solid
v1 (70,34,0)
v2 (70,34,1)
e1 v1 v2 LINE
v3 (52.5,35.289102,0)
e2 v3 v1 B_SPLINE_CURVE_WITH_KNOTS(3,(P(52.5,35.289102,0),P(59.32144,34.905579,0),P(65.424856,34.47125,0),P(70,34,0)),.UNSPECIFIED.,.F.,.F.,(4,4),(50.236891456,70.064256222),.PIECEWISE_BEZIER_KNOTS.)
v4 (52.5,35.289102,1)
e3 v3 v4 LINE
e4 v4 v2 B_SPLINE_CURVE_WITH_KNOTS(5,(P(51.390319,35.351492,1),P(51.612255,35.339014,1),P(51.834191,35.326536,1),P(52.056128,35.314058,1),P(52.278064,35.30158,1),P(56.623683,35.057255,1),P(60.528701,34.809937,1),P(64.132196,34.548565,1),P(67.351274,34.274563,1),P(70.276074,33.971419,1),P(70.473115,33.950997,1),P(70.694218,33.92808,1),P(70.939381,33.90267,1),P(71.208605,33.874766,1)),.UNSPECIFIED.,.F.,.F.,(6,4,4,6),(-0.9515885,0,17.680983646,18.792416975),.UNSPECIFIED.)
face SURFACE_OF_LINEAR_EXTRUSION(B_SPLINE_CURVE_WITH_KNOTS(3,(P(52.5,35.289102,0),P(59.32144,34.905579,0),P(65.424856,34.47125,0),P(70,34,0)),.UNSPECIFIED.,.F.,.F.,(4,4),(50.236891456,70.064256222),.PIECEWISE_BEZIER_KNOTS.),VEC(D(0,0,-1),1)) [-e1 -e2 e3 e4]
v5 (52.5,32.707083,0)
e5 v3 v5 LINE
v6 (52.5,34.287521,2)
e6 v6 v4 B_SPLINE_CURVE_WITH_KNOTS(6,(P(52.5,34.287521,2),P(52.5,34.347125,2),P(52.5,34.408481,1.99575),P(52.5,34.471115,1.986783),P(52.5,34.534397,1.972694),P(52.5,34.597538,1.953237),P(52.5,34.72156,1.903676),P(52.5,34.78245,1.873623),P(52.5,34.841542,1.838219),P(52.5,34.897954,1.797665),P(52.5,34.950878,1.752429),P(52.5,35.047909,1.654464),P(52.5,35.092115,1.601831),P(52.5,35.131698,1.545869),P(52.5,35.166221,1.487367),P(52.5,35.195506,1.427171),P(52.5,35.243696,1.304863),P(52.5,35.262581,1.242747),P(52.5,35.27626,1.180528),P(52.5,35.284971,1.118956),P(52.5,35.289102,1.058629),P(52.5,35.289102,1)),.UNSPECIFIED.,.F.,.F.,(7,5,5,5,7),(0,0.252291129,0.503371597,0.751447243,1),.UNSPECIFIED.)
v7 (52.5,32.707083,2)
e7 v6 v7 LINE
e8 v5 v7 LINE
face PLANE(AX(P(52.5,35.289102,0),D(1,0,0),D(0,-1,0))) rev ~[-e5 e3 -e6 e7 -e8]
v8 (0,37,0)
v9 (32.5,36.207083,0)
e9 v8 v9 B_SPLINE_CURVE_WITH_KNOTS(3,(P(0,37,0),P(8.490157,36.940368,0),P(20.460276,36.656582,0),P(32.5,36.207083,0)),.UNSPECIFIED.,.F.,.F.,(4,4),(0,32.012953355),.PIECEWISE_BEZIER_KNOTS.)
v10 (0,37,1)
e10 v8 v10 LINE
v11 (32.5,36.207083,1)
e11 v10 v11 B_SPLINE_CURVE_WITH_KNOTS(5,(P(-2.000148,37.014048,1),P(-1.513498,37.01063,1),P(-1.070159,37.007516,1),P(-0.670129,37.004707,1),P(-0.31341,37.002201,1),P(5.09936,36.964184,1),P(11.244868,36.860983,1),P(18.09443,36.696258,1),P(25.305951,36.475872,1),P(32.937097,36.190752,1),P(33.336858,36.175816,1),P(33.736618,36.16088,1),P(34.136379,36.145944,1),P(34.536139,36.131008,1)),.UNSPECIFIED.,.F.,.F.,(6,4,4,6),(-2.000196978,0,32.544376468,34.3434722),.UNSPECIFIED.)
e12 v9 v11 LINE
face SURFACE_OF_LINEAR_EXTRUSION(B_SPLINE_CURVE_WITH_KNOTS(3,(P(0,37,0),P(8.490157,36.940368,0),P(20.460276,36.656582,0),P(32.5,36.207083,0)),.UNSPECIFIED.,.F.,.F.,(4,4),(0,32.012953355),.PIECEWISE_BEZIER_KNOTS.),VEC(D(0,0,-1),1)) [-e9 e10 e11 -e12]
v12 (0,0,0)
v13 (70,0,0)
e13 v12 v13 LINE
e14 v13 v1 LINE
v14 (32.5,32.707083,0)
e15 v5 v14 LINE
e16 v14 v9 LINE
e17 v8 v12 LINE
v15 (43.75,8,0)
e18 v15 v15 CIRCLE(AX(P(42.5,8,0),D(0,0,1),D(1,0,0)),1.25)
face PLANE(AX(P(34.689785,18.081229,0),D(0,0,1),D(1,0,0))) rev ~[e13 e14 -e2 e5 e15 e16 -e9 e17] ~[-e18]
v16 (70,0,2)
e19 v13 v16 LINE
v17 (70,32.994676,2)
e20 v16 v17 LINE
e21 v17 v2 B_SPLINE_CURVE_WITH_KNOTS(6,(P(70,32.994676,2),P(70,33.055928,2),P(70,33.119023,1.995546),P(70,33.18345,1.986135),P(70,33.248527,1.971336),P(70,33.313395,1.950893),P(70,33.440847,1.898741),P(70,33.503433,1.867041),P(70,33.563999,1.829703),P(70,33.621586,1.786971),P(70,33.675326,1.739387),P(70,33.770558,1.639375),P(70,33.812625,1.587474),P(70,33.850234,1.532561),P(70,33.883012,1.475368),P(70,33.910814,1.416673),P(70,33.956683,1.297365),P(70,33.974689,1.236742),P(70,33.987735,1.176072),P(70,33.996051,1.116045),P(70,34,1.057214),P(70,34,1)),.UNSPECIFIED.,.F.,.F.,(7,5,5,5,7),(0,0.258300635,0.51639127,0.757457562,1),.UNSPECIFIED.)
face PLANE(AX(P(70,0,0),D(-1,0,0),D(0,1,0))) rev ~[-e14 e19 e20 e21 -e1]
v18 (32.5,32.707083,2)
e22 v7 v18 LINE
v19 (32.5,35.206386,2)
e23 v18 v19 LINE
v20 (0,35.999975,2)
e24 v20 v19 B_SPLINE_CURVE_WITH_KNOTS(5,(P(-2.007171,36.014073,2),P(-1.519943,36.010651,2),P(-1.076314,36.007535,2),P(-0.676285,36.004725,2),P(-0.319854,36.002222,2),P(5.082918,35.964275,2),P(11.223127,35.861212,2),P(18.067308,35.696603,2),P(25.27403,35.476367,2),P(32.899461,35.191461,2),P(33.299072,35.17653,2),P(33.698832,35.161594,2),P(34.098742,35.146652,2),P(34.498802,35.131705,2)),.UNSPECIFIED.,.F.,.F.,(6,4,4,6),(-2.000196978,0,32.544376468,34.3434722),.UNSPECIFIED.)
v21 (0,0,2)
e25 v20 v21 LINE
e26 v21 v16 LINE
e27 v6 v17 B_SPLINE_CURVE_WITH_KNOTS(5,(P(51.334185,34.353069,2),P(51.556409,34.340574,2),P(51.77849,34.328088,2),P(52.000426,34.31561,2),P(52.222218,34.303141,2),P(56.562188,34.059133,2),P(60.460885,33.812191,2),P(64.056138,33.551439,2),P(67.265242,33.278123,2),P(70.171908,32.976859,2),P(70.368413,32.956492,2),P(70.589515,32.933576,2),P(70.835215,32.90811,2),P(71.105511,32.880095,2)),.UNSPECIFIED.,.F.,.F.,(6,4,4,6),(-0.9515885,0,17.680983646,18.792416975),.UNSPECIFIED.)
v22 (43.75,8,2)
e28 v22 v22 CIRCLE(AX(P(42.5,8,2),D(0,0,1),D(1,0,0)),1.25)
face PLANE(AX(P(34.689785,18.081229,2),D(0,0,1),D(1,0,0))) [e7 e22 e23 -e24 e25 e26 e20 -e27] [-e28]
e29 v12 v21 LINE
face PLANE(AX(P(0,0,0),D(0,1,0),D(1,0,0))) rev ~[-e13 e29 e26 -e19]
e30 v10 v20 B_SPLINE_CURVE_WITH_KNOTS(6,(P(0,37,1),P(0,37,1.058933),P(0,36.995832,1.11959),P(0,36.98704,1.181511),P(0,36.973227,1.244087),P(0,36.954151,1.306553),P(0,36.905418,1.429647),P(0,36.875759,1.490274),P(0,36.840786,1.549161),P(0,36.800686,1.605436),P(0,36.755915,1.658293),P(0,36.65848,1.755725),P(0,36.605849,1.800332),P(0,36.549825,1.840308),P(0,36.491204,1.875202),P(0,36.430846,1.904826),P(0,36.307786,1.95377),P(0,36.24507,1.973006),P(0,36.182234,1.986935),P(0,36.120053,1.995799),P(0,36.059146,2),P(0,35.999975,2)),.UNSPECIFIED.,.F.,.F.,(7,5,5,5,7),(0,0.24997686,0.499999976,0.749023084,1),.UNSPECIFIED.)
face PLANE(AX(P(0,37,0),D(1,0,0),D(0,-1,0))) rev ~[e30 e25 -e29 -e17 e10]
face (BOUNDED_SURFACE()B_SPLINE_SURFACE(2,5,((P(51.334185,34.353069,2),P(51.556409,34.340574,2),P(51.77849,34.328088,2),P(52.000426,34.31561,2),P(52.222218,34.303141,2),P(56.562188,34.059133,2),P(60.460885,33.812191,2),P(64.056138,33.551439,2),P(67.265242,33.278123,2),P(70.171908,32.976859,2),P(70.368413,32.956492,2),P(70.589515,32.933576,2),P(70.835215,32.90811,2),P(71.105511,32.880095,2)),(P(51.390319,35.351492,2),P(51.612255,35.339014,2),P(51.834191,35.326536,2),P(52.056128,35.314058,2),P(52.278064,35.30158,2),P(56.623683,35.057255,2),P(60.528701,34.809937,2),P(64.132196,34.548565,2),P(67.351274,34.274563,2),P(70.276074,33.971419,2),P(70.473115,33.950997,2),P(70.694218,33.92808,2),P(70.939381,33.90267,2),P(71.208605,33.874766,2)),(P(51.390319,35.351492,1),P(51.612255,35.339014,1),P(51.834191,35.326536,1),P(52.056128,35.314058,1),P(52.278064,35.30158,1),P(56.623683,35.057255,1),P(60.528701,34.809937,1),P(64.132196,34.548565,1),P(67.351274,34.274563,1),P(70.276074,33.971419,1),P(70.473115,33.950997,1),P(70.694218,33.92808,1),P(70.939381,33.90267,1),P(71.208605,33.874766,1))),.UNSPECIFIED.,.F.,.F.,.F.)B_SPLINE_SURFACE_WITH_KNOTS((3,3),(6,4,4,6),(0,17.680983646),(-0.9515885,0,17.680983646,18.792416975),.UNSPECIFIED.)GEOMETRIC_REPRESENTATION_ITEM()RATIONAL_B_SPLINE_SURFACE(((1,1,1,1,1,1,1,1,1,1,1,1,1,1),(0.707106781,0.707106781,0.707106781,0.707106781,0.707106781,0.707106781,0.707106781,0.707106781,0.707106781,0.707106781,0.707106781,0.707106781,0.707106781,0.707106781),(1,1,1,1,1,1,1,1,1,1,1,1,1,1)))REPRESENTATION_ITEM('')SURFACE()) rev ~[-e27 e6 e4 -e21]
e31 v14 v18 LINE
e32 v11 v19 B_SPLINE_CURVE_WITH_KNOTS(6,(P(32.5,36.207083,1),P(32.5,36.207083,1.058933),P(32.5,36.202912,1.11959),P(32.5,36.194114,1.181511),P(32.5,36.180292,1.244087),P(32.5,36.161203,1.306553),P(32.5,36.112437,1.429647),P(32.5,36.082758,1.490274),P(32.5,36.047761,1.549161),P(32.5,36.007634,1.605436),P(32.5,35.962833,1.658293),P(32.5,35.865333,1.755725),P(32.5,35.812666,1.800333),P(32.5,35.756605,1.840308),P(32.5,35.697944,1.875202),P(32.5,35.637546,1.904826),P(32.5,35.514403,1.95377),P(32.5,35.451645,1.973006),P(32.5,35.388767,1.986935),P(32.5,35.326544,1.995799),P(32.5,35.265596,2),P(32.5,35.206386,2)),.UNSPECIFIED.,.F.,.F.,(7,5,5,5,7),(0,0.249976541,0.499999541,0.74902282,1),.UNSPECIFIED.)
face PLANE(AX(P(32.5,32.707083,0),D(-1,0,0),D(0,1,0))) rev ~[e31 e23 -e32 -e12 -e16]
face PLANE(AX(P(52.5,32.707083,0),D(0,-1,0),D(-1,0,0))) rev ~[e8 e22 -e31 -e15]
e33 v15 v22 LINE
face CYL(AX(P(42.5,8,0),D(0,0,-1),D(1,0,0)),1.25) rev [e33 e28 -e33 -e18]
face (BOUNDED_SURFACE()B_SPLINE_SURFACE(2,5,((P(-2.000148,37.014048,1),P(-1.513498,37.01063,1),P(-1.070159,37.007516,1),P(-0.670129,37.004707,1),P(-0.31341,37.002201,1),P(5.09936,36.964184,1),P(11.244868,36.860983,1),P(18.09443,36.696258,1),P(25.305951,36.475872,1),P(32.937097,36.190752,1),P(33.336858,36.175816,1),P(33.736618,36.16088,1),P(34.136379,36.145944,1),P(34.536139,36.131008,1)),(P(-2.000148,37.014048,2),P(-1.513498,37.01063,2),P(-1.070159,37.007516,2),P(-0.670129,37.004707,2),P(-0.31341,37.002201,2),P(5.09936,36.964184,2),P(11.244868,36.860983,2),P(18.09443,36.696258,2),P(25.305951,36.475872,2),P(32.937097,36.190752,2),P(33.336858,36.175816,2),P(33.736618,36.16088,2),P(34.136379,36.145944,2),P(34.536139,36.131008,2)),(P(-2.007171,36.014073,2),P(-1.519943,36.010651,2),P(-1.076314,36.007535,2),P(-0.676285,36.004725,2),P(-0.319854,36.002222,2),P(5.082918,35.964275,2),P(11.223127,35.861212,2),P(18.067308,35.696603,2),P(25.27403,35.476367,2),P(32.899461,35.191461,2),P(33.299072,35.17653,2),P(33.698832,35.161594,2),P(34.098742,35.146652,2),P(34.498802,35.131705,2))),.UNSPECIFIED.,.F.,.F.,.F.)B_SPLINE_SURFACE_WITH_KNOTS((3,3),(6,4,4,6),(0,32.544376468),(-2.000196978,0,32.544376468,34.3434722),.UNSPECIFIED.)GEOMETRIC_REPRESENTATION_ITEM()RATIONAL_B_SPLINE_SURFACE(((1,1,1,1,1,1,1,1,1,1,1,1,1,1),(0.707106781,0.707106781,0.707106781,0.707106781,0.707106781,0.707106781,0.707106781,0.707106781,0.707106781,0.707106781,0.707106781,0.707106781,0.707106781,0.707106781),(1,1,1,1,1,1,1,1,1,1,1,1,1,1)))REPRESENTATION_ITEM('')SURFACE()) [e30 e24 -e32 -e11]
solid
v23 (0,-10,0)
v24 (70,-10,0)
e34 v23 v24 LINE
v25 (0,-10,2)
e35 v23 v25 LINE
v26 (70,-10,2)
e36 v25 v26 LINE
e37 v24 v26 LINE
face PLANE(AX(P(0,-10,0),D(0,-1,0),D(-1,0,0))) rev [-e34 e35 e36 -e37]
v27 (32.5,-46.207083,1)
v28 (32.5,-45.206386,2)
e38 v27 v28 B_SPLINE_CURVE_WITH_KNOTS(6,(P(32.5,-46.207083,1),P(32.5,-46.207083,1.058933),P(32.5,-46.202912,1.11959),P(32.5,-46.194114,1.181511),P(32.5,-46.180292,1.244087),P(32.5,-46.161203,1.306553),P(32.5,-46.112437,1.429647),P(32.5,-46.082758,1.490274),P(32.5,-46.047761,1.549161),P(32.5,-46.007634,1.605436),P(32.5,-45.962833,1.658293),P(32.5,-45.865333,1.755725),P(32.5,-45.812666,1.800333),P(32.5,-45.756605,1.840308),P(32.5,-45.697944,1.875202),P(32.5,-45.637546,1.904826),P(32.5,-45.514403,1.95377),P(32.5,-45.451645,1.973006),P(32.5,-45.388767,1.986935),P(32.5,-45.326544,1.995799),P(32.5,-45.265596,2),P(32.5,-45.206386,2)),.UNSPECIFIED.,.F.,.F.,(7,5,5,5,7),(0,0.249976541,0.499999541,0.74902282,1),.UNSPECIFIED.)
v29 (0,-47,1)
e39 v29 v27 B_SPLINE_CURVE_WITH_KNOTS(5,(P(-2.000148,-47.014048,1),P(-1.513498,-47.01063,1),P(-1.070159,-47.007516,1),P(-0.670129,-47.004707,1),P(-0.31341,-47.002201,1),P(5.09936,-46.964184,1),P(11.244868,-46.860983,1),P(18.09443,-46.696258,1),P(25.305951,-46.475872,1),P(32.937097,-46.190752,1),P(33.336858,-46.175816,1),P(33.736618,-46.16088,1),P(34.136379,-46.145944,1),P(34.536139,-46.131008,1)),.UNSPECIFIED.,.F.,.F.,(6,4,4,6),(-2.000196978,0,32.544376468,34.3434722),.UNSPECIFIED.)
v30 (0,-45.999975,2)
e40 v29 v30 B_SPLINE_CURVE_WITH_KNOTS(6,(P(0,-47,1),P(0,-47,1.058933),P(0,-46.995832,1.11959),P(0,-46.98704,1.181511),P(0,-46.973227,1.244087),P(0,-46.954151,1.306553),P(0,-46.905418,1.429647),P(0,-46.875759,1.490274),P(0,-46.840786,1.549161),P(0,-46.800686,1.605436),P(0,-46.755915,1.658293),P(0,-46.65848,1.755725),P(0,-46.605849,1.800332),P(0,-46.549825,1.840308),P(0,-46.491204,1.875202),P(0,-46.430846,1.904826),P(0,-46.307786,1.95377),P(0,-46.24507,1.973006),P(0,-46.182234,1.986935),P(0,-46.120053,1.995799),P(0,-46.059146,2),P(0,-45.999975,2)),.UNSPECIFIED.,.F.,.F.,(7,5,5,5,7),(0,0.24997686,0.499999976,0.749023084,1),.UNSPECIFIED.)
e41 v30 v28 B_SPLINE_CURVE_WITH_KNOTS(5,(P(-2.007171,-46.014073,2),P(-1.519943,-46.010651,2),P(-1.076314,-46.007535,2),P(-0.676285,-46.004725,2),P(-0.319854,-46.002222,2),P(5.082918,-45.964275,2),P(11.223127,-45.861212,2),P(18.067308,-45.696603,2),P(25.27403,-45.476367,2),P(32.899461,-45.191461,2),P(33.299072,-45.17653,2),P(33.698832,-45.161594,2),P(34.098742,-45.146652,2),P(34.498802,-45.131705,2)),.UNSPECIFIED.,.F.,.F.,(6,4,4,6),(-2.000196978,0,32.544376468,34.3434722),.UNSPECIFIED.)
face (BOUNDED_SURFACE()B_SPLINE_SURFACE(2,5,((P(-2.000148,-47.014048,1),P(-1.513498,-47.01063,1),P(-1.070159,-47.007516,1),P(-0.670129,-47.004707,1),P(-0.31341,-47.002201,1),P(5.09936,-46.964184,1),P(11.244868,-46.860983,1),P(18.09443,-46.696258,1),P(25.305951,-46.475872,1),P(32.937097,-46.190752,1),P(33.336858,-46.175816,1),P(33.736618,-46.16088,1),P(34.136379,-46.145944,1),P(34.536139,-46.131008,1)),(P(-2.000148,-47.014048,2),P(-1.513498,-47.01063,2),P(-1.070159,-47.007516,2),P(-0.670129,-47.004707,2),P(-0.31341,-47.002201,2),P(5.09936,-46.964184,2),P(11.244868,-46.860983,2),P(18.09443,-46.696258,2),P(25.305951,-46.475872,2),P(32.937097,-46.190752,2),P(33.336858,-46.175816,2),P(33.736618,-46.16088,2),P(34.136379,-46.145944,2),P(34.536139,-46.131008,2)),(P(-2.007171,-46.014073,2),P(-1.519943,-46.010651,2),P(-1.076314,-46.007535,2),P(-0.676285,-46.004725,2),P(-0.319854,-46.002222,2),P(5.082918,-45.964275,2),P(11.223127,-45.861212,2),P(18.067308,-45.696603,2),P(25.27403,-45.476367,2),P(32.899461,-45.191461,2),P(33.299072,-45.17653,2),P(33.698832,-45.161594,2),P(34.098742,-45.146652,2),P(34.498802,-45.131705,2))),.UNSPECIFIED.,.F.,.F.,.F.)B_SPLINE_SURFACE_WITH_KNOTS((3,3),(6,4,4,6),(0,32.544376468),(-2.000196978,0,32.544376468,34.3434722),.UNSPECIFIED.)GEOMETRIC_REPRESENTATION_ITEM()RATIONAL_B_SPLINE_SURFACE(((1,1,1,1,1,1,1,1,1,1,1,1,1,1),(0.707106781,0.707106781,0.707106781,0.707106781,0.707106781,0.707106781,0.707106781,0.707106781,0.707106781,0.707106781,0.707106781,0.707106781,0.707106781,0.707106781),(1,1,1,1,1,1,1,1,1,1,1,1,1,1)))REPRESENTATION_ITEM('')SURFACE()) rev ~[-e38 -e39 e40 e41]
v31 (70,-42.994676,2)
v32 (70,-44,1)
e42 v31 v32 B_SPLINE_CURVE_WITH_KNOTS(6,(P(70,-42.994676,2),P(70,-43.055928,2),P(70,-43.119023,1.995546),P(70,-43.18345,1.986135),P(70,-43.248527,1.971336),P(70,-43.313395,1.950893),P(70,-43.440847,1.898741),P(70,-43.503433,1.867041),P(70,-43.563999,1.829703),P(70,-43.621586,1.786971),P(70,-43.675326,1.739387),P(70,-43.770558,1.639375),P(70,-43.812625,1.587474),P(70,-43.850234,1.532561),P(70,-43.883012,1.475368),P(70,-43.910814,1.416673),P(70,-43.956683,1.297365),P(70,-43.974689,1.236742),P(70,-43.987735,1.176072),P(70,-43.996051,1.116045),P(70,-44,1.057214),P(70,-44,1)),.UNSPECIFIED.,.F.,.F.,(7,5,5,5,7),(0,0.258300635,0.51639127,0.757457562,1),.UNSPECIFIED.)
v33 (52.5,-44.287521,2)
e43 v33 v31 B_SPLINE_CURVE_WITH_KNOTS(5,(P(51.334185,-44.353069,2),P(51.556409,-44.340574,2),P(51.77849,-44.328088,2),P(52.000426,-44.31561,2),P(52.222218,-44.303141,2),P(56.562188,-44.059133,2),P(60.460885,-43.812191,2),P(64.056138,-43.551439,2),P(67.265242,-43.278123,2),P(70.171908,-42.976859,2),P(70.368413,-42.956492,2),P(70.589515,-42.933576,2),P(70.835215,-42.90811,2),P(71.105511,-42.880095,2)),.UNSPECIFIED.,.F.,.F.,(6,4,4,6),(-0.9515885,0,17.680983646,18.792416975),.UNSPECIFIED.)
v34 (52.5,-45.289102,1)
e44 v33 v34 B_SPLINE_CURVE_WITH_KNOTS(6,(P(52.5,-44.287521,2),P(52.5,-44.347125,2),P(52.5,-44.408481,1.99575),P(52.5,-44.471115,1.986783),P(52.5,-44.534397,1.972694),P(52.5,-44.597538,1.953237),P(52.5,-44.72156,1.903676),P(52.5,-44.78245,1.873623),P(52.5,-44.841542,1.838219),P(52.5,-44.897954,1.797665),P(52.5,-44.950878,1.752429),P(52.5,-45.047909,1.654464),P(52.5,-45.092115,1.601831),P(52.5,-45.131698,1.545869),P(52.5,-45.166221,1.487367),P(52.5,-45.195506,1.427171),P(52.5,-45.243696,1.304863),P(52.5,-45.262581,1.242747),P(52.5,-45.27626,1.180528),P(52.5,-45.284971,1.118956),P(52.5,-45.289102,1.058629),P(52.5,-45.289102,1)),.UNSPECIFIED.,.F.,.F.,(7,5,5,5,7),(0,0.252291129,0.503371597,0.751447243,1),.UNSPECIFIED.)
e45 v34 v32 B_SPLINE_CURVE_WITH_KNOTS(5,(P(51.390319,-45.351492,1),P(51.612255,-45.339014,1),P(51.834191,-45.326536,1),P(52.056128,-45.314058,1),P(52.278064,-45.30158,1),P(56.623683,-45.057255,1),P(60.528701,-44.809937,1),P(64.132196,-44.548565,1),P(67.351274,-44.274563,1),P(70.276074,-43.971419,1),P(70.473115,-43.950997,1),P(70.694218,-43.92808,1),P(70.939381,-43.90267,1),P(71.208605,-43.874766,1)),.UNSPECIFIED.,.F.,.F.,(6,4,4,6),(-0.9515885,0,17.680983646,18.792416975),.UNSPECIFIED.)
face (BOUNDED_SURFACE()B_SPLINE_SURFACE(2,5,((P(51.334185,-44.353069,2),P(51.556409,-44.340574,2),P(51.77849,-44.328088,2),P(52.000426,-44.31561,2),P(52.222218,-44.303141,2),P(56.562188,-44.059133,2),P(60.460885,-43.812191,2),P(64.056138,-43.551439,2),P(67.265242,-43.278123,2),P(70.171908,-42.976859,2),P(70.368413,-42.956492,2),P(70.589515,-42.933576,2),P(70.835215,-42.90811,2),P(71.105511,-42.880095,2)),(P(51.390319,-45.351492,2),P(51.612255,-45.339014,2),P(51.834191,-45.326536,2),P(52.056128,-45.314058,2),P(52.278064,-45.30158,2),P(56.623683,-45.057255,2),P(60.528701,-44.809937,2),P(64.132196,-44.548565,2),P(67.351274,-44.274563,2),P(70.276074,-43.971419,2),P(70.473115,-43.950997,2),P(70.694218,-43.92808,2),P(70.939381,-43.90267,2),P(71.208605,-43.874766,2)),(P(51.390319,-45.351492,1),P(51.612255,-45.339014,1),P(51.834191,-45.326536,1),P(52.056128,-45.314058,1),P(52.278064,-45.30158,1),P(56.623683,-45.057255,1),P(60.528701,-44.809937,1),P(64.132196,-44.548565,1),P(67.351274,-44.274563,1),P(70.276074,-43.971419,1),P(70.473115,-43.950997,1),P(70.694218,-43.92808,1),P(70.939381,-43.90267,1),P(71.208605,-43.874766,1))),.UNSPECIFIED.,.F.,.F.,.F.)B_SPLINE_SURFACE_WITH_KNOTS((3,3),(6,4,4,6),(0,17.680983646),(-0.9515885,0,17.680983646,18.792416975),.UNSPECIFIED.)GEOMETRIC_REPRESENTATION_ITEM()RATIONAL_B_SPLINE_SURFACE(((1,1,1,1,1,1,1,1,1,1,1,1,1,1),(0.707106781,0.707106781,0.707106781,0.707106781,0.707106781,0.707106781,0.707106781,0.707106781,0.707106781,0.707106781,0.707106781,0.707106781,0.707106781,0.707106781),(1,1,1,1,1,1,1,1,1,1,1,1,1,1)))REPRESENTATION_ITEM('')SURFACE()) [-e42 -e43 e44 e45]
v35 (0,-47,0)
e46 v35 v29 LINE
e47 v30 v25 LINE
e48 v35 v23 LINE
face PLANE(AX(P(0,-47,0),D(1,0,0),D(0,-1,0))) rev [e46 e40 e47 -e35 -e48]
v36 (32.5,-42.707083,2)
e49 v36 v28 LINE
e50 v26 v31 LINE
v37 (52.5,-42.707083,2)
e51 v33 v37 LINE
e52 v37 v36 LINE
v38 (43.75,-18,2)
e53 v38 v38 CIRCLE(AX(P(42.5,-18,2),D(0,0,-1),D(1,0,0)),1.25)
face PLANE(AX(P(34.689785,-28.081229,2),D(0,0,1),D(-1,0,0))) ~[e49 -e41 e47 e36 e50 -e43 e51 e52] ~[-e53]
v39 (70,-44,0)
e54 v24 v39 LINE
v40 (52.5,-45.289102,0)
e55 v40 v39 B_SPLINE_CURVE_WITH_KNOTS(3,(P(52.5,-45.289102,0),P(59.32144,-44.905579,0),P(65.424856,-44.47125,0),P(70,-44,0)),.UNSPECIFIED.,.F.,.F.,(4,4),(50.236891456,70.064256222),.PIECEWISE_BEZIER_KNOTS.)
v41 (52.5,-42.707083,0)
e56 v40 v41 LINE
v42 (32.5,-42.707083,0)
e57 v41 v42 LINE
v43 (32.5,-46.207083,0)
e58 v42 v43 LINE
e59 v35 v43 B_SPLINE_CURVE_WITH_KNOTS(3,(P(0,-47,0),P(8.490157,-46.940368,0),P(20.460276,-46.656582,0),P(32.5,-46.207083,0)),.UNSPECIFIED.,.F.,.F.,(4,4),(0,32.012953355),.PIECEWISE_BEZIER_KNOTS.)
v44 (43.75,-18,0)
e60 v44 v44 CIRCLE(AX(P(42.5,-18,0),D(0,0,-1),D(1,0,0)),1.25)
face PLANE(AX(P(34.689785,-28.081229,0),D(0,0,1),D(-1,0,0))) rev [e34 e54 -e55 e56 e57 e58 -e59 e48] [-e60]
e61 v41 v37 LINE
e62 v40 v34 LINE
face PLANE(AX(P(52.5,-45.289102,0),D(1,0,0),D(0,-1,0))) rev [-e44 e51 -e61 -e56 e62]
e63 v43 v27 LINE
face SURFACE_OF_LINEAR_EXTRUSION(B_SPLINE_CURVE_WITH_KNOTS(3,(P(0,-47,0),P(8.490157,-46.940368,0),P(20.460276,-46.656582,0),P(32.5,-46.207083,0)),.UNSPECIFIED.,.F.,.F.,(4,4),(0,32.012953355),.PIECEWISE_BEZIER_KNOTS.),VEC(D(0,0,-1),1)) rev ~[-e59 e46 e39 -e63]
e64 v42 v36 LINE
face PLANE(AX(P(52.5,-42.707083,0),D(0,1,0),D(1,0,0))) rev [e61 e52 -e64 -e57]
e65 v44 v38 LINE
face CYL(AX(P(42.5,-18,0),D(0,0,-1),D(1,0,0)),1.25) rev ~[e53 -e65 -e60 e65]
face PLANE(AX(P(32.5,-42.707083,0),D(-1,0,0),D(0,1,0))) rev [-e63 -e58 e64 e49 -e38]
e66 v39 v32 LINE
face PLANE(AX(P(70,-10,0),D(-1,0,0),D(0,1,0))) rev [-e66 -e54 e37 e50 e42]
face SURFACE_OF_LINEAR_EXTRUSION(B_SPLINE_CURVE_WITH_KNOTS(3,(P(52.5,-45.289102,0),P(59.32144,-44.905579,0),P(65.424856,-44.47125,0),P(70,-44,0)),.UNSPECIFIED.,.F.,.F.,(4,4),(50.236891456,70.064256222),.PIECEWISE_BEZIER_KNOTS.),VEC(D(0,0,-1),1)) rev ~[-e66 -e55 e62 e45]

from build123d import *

# Parameters (mm, degrees)
F0_R     = 1.25
F1_DEPTH = 2
F2_DEPTH = 2
F3_R     = 1


# Not quite as in the source:
# - a feature names something its author has since deleted; it is built from what else it names


with BuildPart() as f1:
    # F0 (on Top) → F1 (new body)
    with BuildSketch(Plane.XY):
        with BuildLine():
            Line((0, 37), (0, 0))
            Line((0, 0), (70, 0))
            Line((70, 0), (70, 34))
            add(Edge.make_bspline(
                [(52.5, 35.2891019981), (59.3214395591, 34.9055787176), (65.4248555138, 34.4712498014), (70, 34)],
                knots=[50.2368914557, 50.2368914557, 50.2368914557, 50.2368914557, 70.0642562224, 70.0642562224, 70.0642562224, 70.0642562224], degree=3))
            Line((52.5, 35.2891019981), (52.5, 32.7070827343))
            Line((52.5, 32.7070827343), (32.5, 32.7070827343))
            Line((32.5, 32.7070827343), (32.5, 36.2070827343))
            add(Edge.make_bspline(
                [(0, 37), (8.4901566801, 36.9403682594), (20.460276432, 36.6565820507), (32.5, 36.2070827343)],
                knots=[0, 0, 0, 0, 32.0129533553, 32.0129533553, 32.0129533553, 32.0129533553], degree=3))
        make_face()
        with Locations((42.5, 8)):
            Circle(F0_R, mode=Mode.SUBTRACT)
    extrude(amount=F1_DEPTH)

    # F0 (on Top) → F2 (join)
    with BuildSketch(Plane.XY):
        with BuildLine():
            Line((0, 37), (0, 0))
            Line((0, 0), (70, 0))
            Line((70, 0), (70, 34))
            add(Edge.make_bspline(
                [(52.5, 35.2891019981), (59.3214395591, 34.9055787176), (65.4248555138, 34.4712498014), (70, 34)],
                knots=[50.2368914557, 50.2368914557, 50.2368914557, 50.2368914557, 70.0642562224, 70.0642562224, 70.0642562224, 70.0642562224], degree=3))
            Line((52.5, 35.2891019981), (52.5, 32.7070827343))
            Line((52.5, 32.7070827343), (32.5, 32.7070827343))
            Line((32.5, 32.7070827343), (32.5, 36.2070827343))
            add(Edge.make_bspline(
                [(0, 37), (8.4901566801, 36.9403682594), (20.460276432, 36.6565820507), (32.5, 36.2070827343)],
                knots=[0, 0, 0, 0, 32.0129533553, 32.0129533553, 32.0129533553, 32.0129533553], degree=3))
        make_face()
        with Locations((42.5, 8)):
            Circle(F0_R, mode=Mode.SUBTRACT)
    extrude(amount=F2_DEPTH)

    # F3
    f3_edges = [f1.edges().sort_by_distance(p)[0] for p in [
        (16.252703, 36.716727, 2),
        (61.256993, 34.737622, 2),
    ]]
    fillet(f3_edges, radius=F3_R)


with BuildPart() as f5_1:
    # F5: instance of F1
    add(f1.part.mirror(Plane(origin=(35, -5, 1), x_dir=(1, 0, 0), z_dir=(0, -1, 0))))


solid = Compound([f1.part, f5_1.part])
